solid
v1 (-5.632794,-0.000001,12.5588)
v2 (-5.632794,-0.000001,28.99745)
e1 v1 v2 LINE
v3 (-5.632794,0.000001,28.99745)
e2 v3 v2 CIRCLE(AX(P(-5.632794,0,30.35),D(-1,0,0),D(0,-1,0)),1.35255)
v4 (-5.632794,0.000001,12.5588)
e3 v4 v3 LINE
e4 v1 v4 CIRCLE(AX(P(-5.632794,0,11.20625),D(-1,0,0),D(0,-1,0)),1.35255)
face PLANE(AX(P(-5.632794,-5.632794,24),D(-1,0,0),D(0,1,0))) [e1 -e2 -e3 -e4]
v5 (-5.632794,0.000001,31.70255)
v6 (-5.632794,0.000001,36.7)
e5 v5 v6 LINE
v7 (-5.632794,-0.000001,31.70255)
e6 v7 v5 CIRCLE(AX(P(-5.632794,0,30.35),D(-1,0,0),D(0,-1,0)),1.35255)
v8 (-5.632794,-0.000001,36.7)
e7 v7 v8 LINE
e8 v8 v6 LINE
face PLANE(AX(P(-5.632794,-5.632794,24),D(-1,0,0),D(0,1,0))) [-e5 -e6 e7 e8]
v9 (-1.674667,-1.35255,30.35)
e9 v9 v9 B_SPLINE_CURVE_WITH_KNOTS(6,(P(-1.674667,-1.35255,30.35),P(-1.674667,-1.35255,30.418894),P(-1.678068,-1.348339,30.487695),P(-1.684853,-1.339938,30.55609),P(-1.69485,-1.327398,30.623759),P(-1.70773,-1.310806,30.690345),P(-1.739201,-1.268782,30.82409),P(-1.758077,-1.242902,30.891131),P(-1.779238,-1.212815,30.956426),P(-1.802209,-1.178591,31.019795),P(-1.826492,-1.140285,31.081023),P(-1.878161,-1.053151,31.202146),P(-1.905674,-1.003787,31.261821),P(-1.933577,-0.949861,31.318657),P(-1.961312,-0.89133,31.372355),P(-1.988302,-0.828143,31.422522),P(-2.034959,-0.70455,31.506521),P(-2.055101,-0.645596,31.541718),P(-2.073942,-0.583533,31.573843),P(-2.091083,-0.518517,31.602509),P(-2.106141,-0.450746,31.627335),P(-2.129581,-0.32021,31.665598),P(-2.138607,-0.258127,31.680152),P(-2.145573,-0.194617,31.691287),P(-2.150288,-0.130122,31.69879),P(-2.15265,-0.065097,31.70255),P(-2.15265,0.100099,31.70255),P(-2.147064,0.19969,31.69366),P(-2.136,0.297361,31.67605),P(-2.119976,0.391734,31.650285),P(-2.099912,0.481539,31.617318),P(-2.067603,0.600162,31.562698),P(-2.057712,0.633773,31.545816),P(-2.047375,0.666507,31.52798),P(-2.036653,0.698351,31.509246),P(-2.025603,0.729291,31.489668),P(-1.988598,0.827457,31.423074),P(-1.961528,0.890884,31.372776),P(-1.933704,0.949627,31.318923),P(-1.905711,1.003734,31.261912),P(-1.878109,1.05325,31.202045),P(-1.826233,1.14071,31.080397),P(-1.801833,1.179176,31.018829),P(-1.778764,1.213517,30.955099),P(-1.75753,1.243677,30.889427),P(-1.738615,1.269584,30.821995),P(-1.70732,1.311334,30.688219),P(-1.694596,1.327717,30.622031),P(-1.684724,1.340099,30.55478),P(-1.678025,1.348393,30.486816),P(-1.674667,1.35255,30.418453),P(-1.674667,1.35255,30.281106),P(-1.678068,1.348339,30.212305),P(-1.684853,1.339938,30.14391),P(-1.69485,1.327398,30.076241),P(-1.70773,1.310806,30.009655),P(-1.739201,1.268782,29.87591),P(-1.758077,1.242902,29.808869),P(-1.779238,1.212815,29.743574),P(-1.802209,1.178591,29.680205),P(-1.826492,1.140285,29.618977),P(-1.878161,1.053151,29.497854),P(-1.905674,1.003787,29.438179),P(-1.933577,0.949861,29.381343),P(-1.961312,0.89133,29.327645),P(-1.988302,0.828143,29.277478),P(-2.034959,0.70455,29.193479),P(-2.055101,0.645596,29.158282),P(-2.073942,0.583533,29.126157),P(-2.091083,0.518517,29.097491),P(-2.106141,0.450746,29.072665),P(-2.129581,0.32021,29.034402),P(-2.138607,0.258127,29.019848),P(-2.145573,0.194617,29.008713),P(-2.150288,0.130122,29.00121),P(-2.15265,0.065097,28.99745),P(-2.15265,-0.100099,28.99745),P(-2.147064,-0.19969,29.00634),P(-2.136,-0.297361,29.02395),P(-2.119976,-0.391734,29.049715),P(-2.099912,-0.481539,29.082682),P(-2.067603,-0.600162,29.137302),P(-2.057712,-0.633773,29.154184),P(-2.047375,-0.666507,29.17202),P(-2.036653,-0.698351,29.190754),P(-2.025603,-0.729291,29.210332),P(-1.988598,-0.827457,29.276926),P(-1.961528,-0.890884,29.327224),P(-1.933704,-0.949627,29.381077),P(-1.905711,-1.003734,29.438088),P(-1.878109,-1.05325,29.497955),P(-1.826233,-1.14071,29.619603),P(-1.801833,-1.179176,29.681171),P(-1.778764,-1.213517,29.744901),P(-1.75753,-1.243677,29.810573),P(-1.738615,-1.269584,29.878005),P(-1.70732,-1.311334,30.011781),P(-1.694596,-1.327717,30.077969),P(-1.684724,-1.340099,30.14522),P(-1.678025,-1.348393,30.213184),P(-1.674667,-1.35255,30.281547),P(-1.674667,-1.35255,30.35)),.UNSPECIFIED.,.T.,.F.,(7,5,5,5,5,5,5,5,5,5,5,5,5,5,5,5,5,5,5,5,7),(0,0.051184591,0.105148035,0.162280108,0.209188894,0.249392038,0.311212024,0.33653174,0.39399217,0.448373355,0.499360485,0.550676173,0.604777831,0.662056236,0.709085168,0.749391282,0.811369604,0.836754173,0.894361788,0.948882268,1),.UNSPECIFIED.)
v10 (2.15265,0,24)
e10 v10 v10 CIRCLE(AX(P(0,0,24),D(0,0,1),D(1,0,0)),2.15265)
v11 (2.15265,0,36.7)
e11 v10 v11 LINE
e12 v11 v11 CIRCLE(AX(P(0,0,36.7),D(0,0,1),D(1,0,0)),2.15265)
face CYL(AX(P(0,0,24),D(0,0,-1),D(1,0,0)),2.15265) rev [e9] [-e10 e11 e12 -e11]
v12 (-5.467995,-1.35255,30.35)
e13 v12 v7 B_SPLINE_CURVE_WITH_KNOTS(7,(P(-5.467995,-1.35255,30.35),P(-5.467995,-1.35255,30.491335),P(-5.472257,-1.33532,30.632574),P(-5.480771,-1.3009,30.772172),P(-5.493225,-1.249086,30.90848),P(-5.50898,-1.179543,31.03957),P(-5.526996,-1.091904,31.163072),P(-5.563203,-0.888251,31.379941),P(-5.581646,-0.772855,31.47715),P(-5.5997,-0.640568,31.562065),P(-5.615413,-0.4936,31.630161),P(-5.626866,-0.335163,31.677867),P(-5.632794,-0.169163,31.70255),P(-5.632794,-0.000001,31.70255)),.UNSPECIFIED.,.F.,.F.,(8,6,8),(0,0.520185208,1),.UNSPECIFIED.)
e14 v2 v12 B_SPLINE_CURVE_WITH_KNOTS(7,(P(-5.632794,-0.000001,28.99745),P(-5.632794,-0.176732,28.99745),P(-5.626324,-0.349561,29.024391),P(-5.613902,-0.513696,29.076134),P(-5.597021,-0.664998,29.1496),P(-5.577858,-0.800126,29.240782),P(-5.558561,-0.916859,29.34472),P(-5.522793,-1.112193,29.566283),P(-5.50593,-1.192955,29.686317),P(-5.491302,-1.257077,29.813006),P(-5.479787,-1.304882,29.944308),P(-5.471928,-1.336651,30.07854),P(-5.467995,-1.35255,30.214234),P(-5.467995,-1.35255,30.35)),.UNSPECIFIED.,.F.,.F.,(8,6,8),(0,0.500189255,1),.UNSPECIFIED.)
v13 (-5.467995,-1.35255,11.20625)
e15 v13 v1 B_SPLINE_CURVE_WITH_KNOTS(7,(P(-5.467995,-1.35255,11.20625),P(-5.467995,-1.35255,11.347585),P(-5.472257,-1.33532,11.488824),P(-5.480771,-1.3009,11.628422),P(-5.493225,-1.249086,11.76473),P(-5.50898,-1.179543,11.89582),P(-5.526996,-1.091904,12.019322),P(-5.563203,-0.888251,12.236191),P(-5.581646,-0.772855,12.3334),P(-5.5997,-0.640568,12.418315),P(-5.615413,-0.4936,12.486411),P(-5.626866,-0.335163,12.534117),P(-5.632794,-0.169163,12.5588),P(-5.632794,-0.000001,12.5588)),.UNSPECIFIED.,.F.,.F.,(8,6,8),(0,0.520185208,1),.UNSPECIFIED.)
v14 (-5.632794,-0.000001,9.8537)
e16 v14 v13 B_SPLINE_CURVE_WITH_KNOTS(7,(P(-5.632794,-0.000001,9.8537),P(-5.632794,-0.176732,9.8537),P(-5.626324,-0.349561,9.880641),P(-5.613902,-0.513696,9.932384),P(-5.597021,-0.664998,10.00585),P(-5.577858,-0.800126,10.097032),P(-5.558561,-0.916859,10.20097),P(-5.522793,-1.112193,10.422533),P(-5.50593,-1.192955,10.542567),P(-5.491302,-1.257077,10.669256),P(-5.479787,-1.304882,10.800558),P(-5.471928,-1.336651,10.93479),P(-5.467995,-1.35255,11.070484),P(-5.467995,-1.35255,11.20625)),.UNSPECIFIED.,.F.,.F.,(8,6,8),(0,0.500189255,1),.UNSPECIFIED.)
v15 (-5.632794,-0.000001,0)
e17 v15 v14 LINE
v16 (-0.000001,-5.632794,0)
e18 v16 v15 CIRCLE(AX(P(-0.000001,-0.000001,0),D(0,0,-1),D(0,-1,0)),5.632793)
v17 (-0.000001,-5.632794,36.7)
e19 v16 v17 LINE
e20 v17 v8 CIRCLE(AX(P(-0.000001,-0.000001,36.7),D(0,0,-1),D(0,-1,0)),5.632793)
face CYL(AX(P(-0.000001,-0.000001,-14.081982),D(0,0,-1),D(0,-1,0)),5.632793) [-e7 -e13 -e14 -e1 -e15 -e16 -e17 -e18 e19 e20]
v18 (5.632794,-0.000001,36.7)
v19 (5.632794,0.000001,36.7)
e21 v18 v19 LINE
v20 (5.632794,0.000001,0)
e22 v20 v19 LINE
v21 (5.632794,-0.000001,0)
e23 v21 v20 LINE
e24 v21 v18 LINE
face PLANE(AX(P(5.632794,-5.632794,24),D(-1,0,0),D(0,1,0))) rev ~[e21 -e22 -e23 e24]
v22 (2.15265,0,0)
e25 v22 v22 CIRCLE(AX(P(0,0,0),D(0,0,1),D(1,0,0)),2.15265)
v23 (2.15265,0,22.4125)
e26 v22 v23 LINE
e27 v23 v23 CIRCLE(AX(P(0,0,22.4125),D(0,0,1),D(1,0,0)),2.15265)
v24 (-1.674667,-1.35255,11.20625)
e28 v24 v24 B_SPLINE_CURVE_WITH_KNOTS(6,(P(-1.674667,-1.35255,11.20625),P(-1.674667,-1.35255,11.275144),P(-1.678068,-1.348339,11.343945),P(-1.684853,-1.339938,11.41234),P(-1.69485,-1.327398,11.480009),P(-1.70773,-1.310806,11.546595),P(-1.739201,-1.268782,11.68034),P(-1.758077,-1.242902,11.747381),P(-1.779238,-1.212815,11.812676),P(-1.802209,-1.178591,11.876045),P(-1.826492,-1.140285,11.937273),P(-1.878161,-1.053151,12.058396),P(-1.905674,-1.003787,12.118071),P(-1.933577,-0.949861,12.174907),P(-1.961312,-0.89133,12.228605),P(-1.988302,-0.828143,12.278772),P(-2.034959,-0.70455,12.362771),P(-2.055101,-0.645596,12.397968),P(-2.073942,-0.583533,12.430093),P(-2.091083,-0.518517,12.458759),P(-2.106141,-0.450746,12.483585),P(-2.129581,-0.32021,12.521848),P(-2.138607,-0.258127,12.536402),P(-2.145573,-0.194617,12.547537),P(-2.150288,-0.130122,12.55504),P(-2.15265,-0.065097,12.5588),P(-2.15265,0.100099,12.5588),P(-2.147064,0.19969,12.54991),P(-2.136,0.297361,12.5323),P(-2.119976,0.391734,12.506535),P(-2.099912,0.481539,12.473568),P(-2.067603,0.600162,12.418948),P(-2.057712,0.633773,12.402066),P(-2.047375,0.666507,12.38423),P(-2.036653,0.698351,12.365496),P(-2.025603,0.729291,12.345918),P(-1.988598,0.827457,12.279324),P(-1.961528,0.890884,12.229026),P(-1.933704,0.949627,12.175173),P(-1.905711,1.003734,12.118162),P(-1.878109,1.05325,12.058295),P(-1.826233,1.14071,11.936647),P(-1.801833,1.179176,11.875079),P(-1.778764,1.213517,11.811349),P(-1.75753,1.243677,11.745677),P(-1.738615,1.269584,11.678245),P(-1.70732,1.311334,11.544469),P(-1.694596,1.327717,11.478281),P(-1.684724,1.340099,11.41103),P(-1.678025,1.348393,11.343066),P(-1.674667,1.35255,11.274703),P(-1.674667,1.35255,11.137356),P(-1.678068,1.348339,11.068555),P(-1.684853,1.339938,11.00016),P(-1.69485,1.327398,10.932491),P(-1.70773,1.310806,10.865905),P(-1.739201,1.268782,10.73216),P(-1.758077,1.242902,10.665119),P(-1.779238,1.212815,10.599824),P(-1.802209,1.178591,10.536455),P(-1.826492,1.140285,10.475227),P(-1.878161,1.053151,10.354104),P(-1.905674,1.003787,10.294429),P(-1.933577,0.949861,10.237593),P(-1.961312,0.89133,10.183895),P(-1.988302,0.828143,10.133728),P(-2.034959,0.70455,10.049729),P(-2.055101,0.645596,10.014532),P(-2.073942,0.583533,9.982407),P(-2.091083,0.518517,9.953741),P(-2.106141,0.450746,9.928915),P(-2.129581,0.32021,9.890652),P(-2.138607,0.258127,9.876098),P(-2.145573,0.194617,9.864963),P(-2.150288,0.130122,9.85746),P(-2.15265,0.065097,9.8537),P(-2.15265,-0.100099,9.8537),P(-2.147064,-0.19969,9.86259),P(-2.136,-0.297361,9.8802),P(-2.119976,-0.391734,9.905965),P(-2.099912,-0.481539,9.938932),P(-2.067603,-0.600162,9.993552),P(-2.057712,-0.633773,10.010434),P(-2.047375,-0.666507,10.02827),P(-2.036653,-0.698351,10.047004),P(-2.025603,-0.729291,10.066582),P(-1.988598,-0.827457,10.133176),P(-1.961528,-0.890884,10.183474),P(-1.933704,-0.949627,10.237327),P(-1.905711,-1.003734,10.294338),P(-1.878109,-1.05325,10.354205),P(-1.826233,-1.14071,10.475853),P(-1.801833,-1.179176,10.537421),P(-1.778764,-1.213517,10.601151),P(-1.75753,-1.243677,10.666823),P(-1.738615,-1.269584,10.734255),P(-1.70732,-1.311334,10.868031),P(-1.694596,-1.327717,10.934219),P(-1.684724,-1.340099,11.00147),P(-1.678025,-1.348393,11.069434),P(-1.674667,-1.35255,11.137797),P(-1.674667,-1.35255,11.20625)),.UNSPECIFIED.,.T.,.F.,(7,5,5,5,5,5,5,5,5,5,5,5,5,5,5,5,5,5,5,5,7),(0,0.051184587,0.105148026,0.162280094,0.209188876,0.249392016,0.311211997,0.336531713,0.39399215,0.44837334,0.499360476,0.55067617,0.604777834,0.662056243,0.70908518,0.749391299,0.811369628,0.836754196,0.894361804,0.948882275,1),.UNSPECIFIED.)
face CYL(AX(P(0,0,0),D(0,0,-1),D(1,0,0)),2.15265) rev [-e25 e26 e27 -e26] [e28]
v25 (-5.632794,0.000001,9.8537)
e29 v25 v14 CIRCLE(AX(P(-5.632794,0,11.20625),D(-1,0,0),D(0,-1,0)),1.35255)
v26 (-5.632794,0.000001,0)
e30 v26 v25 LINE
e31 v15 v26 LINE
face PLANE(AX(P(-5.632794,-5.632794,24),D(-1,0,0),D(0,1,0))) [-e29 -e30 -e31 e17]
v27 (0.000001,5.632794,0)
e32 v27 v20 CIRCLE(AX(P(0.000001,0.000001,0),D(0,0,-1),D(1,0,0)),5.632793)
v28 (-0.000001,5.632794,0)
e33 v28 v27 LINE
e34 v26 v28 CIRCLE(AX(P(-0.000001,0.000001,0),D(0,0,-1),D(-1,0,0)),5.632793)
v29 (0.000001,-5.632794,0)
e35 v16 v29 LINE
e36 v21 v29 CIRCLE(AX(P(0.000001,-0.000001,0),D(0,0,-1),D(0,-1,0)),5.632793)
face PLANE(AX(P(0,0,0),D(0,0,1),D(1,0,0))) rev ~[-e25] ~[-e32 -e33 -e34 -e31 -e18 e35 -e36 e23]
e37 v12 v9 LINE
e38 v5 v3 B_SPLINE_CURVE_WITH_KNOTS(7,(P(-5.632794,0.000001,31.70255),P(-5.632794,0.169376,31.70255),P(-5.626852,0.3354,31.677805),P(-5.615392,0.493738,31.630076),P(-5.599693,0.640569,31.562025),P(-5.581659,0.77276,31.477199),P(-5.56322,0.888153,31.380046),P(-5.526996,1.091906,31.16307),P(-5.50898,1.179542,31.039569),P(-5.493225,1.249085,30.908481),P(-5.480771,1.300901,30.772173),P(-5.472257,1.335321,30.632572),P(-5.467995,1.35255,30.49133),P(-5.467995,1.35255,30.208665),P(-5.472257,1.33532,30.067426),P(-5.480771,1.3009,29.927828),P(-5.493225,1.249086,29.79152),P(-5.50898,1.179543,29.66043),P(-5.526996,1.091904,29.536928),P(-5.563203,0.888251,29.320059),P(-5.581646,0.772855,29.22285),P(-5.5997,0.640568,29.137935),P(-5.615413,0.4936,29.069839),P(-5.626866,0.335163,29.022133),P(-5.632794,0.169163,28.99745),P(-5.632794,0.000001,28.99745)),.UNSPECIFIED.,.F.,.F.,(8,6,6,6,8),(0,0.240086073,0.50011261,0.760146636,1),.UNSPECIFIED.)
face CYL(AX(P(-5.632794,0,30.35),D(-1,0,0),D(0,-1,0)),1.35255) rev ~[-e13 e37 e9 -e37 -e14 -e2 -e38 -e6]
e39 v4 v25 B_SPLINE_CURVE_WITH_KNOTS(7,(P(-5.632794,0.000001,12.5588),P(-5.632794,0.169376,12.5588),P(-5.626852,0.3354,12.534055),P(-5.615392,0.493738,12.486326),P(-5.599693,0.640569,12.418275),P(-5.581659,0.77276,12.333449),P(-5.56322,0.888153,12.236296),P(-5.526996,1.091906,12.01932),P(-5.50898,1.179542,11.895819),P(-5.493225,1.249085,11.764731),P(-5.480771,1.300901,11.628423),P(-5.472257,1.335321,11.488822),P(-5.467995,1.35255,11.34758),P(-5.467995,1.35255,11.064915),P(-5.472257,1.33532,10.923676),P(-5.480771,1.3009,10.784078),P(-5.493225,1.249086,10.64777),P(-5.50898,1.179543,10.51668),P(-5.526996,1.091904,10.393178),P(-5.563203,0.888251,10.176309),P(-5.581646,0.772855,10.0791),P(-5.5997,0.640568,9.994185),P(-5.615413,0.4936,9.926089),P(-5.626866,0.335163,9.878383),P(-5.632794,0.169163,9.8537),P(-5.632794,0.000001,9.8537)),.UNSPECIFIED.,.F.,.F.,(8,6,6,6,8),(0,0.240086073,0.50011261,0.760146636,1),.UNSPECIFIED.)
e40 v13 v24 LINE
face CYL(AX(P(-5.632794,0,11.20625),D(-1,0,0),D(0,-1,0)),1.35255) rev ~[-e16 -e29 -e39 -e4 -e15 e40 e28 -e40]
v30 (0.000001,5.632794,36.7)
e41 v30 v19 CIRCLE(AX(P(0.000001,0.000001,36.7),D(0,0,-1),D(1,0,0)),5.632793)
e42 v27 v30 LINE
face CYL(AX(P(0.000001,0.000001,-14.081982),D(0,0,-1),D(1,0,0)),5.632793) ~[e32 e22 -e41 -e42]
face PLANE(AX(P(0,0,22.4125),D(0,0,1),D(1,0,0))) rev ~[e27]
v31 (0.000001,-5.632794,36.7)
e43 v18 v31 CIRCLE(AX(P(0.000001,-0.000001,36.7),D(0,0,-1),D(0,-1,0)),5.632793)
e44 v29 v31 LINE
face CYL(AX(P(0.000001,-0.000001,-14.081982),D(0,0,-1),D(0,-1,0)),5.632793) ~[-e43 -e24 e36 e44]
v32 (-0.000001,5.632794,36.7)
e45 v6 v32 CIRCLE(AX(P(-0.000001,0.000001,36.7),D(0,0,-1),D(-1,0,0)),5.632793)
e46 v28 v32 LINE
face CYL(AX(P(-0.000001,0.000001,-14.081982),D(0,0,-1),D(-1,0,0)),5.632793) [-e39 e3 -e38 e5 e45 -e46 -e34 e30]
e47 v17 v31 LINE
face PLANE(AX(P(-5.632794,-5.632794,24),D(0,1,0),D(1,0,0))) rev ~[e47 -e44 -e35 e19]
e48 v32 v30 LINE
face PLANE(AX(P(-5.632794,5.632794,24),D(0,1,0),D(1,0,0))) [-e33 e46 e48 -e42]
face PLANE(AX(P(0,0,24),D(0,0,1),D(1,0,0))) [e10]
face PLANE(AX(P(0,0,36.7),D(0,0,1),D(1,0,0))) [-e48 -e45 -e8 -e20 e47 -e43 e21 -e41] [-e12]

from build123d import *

# Parameters (mm, degrees)
F0_W        = 11.2655872395
F0_H        = 11.2655872395
F0_R        = 2.15265
F1_DEPTH    = 22.4125
F2_W        = 11.2655872395
F2_H        = 11.2655872395
F3_DEPTH    = 1.5875
F4_W        = 11.2655872395
F4_H        = 11.2655872395
F4_R        = 2.15265
F5_DEPTH    = 12.7
F6_R        = 1.35255
F7_DEPTH    = 4.9581264334
F8_T1_DEPTH = 64.8639645


# Not quite as in the source:
# - a fillet or chamfer that OpenCascade refuses, or shapes differently, is made with other operations: its cross-section is extruded or revolved along the edge and cut away or added


with BuildPart() as f1:
    # F0 (on Top) → F1 (new body)
    with BuildSketch(Plane.XY):
        Rectangle(F0_W, F0_H)
        Circle(F0_R, mode=Mode.SUBTRACT)
    extrude(amount=F1_DEPTH)

    # F2 (on face) → F3 (join)
    with BuildSketch(Plane.XY.offset(22.4125)):
        Rectangle(F2_W, F2_H)
    extrude(amount=F3_DEPTH)

    # F4 (on face) → F5 (join)
    with BuildSketch(Plane.XY.offset(24)):
        Rectangle(F4_W, F4_H)
        Circle(F4_R, mode=Mode.SUBTRACT)
    extrude(amount=F5_DEPTH)

    # F6 (on face) → F7 (cut, up to face)
    with BuildSketch(Plane(origin=(-5.6327936197, 0, 0), x_dir=(0, -1, 0), z_dir=(-1, 0, 0))):
        with Locations((0, 11.20625)):
            Circle(F6_R)
        with Locations((0, 30.35)):
            Circle(F6_R)
    extrude(amount=-F7_DEPTH, mode=Mode.SUBTRACT)

    # F8: fillet of radius 5.6327929 on 4 edges, made by hand

    # F8_s2 → F8_t1 (cut)
    with BuildSketch(Plane.XY.offset(-14.08198225)):
        with BuildLine():
            ThreePointArc((-5.6327936197, 7.197e-07), (-3.9829867763, 3.9829867763), (-7.197e-07, 5.6327936197))
            Line((-7.197e-07, 5.6327936197), (-5.6327936197, 5.6327936197))
            Line((-5.6327936197, 5.6327936197), (-5.6327936197, 7.197e-07))
        make_face()
        with BuildLine():
            ThreePointArc((5.6327936197, 7.197e-07), (3.9829867763, 3.9829867763), (7.197e-07, 5.6327936197))
            Line((7.197e-07, 5.6327936197), (5.6327936197, 5.6327936197))
            Line((5.6327936197, 5.6327936197), (5.6327936197, 7.197e-07))
        make_face()
        with BuildLine():
            ThreePointArc((-7.197e-07, -5.6327936197), (-3.9829867763, -3.9829867763), (-5.6327936197, -7.197e-07))
            Line((-5.6327936197, -7.197e-07), (-5.6327936197, -5.6327936197))
            Line((-5.6327936197, -5.6327936197), (-7.197e-07, -5.6327936197))
        make_face()
        with BuildLine():
            ThreePointArc((7.197e-07, -5.6327936197), (3.9829867763, -3.9829867763), (5.6327936197, -7.197e-07))
            Line((5.6327936197, -7.197e-07), (5.6327936197, -5.6327936197))
            Line((5.6327936197, -5.6327936197), (7.197e-07, -5.6327936197))
        make_face()
    extrude(amount=F8_T1_DEPTH, mode=Mode.SUBTRACT)


solid = f1.part
